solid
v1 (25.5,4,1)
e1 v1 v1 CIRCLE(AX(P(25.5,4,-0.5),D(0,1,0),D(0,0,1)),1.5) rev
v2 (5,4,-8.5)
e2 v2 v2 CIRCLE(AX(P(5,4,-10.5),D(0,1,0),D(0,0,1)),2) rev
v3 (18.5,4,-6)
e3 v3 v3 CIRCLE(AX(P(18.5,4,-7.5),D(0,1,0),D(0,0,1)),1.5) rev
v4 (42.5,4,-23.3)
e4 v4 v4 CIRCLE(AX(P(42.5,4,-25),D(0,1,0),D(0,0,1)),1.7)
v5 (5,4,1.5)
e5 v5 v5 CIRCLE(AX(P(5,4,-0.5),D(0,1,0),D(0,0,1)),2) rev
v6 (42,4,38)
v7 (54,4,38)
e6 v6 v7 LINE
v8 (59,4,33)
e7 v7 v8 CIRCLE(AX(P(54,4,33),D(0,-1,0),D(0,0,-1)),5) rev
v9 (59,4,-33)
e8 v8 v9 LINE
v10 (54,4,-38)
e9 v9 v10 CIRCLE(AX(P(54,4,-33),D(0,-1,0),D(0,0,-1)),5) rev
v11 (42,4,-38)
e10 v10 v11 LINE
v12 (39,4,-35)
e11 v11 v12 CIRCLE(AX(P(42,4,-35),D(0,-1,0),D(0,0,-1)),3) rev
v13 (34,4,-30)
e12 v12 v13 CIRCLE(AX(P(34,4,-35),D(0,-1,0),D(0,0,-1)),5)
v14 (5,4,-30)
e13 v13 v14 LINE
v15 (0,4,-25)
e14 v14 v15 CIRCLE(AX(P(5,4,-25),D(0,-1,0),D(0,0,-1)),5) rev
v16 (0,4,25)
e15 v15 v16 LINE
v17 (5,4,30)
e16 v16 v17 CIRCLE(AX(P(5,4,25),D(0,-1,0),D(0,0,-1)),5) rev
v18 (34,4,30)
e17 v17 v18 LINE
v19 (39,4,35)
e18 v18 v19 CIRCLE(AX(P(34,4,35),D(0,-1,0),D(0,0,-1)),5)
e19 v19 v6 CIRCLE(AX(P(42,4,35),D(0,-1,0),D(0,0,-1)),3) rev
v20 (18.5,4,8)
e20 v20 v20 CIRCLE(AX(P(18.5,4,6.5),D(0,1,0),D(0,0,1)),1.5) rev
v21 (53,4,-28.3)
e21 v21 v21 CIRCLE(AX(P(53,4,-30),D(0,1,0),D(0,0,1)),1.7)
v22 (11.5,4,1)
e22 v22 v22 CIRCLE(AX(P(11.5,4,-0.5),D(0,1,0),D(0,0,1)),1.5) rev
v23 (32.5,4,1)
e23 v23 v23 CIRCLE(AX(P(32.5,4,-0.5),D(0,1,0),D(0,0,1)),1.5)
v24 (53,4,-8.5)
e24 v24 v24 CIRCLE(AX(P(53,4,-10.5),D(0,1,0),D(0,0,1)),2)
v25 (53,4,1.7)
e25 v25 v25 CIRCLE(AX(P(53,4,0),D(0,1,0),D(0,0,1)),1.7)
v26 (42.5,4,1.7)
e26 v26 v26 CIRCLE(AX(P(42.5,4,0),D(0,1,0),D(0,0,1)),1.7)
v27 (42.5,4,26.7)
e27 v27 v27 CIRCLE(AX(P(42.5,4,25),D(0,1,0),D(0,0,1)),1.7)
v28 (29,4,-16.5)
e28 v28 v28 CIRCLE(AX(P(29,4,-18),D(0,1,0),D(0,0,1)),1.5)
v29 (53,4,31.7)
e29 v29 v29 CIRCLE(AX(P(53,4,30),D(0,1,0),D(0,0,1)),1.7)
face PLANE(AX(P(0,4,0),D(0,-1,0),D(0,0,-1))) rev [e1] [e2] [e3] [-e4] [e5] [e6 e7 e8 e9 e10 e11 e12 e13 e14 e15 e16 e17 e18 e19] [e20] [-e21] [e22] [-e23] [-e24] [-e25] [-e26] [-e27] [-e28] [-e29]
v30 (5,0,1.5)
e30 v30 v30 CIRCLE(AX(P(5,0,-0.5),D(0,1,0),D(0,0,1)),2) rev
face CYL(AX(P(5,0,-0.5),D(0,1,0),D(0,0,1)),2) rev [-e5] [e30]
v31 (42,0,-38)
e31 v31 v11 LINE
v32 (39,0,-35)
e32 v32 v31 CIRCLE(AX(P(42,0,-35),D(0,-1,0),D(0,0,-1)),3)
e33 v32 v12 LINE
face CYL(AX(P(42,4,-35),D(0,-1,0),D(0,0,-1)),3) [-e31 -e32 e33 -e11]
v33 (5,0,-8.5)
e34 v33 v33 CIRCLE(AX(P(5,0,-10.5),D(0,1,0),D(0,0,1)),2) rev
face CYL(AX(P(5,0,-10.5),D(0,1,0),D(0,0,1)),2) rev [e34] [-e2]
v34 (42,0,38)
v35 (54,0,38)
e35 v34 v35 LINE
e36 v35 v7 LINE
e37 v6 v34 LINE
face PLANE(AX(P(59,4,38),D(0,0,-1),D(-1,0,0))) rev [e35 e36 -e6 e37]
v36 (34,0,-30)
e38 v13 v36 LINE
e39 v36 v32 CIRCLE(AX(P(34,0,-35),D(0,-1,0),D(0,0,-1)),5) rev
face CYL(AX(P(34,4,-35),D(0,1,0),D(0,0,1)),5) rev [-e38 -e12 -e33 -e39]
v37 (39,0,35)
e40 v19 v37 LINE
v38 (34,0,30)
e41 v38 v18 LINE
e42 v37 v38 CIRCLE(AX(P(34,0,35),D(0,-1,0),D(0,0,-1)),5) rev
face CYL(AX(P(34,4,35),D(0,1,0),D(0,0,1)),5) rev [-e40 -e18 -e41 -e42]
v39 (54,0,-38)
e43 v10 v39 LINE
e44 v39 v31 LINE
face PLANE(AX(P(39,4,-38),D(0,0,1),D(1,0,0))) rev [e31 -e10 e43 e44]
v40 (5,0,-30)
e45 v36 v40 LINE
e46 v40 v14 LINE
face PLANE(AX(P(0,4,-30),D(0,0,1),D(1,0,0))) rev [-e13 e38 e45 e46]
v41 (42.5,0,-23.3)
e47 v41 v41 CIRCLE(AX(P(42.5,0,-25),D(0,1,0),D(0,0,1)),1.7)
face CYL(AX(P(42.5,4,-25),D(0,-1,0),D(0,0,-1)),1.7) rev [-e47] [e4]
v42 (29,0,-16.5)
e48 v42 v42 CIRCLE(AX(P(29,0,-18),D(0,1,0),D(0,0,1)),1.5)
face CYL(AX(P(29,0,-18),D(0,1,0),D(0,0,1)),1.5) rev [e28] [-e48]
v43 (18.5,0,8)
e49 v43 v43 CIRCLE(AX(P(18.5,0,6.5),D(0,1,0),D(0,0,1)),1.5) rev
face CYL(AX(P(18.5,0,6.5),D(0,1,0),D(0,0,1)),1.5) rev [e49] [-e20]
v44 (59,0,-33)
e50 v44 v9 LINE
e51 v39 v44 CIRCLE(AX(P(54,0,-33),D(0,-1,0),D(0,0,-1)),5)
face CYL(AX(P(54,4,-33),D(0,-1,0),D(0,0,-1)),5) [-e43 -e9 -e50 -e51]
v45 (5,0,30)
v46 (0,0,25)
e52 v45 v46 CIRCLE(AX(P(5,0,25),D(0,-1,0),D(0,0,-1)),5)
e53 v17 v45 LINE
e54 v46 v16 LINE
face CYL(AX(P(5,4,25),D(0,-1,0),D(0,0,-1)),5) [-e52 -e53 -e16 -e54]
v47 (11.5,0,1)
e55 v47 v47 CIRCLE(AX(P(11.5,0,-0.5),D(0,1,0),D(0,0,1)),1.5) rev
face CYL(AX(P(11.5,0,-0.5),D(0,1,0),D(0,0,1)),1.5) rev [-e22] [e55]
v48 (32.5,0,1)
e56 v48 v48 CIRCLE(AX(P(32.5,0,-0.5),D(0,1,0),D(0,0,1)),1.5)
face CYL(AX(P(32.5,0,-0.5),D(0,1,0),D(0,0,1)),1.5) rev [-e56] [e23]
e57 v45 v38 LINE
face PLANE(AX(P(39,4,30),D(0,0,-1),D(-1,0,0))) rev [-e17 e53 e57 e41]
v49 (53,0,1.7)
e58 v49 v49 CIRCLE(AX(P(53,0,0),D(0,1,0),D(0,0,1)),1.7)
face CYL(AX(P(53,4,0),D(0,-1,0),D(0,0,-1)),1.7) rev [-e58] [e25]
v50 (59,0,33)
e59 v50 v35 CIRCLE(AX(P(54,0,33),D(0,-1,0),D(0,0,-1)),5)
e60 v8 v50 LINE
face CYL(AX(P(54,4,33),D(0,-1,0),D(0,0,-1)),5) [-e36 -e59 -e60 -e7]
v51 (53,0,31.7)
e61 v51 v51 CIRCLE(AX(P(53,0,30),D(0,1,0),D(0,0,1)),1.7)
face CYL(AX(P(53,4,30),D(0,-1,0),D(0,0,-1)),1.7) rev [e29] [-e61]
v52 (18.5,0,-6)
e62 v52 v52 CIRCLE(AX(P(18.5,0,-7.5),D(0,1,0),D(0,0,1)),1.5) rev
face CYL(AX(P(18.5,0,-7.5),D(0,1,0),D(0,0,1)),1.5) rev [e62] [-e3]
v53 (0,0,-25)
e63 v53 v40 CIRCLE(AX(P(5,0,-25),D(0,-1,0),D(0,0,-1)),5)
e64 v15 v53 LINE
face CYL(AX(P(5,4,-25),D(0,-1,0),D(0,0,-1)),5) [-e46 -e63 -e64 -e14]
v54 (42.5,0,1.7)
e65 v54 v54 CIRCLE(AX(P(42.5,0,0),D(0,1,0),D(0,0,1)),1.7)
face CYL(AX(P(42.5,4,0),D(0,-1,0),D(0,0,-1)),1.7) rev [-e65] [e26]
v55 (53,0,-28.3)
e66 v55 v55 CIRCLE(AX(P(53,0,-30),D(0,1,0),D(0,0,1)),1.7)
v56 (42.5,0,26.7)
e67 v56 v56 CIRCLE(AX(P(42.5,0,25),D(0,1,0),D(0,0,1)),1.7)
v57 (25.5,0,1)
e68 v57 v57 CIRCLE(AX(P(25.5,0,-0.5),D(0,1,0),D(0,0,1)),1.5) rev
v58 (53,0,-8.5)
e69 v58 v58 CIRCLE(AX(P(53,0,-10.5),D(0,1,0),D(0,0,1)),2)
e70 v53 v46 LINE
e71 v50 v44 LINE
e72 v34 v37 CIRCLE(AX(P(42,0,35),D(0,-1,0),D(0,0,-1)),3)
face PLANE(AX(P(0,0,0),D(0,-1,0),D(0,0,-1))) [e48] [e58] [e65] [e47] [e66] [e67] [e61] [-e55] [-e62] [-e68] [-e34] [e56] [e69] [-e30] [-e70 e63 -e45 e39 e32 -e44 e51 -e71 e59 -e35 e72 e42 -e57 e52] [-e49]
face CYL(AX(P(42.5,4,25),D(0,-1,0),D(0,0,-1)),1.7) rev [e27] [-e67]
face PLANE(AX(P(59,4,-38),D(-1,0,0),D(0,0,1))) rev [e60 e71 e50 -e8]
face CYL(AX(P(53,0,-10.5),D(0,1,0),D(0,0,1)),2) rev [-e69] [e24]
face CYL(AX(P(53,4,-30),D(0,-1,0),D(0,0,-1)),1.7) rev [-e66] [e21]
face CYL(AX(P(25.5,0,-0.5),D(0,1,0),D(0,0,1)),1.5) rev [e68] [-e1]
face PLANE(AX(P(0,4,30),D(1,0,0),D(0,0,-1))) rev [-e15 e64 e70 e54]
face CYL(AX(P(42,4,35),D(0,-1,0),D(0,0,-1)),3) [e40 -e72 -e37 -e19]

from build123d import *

# Parameters (mm, degrees)
SKETCH_1_R          = 1.7
EXTRUDE_1_DEPTH     = 4
SKETCH_2_R          = 1.5
SKETCH_2_R_2        = 2
CUT_EXTRUDE_1_DEPTH = 71.292247083
FILLET_1_R          = 5
FILLET_2_R          = 3


with BuildPart() as part:
    # 草图1 → 凸台-拉伸1 (new body)
    with BuildSketch(Plane(origin=(0, 0, 0), x_dir=(1, 0, 0), z_dir=(0, 1, 0))):
        Polygon((0, 0), (0, 30), (39, 30), (39, 38), (59, 38), (59, -38), (39, -38), (39, -30), (0, -30), align=None)
        with Locations(Location((42.5, 25, 0), (0, 0, 270))):
            Circle(SKETCH_1_R, mode=Mode.SUBTRACT)
        with Locations(Location((42.5, -25, 0), (0, 0, 270))):
            Circle(SKETCH_1_R, mode=Mode.SUBTRACT)
        with Locations(Location((42.5, 0, 0), (0, 0, 270))):
            Circle(SKETCH_1_R, mode=Mode.SUBTRACT)
        with Locations(Location((53, 30, 0), (0, 0, 270))):
            Circle(SKETCH_1_R, mode=Mode.SUBTRACT)
        with Locations(Location((53, 0, 0), (0, 0, 270))):
            Circle(SKETCH_1_R, mode=Mode.SUBTRACT)
        with Locations(Location((53, -30, 0), (0, 0, 270))):
            Circle(SKETCH_1_R, mode=Mode.SUBTRACT)
    extrude(amount=EXTRUDE_1_DEPTH)

    # 草图2 → 切除-拉伸1 (cut, through all)
    with BuildSketch(Plane(origin=(0, 4, 0), x_dir=(1, 0, 0), z_dir=(0, 1, 0))):
        with Locations(Location((32.5, 0.5, 0), (0, 0, 270))):
            Circle(SKETCH_2_R)
        with Locations(Location((5, 0.5, 0), (0, 0, 270))):
            Circle(SKETCH_2_R_2)
        with Locations(Location((5, 10.5, 0), (0, 0, 270))):
            Circle(SKETCH_2_R_2)
        with Locations(Location((53, 10.5, 0), (0, 0, 270))):
            Circle(SKETCH_2_R_2)
        with Locations(Location((29, 18, 0), (0, 0, 270))):
            Circle(SKETCH_2_R)
        with Locations(Location((18.5, -6.5, 0), (0, 0, 270))):
            Circle(SKETCH_2_R)
        with Locations(Location((11.5, 0.5, 0), (0, 0, 270))):
            Circle(SKETCH_2_R)
        with Locations(Location((25.5, 0.5, 0), (0, 0, 270))):
            Circle(SKETCH_2_R)
        with Locations(Location((18.5, 7.5, 0), (0, 0, 270))):
            Circle(SKETCH_2_R)
    extrude(amount=-CUT_EXTRUDE_1_DEPTH, mode=Mode.SUBTRACT)

    # 圆角1
    fillet_1_edges = [part.edges().sort_by_distance(p)[0] for p in [
        (59, 2, 38),
        (39, 2, 30),
        (0, 2, 30),
        (0, 2, -30),
        (39, 2, -30),
        (59, 2, -38),
    ]]
    fillet(fillet_1_edges, radius=FILLET_1_R)

    # 圆角2
    fillet_2_edges = [part.edges().sort_by_distance(p)[0] for p in [
        (39, 2, 38),
        (39, 2, -38),
    ]]
    fillet(fillet_2_edges, radius=FILLET_2_R - 0.0001)  # a hair under: the kernel refuses the full size


solid = part.part
